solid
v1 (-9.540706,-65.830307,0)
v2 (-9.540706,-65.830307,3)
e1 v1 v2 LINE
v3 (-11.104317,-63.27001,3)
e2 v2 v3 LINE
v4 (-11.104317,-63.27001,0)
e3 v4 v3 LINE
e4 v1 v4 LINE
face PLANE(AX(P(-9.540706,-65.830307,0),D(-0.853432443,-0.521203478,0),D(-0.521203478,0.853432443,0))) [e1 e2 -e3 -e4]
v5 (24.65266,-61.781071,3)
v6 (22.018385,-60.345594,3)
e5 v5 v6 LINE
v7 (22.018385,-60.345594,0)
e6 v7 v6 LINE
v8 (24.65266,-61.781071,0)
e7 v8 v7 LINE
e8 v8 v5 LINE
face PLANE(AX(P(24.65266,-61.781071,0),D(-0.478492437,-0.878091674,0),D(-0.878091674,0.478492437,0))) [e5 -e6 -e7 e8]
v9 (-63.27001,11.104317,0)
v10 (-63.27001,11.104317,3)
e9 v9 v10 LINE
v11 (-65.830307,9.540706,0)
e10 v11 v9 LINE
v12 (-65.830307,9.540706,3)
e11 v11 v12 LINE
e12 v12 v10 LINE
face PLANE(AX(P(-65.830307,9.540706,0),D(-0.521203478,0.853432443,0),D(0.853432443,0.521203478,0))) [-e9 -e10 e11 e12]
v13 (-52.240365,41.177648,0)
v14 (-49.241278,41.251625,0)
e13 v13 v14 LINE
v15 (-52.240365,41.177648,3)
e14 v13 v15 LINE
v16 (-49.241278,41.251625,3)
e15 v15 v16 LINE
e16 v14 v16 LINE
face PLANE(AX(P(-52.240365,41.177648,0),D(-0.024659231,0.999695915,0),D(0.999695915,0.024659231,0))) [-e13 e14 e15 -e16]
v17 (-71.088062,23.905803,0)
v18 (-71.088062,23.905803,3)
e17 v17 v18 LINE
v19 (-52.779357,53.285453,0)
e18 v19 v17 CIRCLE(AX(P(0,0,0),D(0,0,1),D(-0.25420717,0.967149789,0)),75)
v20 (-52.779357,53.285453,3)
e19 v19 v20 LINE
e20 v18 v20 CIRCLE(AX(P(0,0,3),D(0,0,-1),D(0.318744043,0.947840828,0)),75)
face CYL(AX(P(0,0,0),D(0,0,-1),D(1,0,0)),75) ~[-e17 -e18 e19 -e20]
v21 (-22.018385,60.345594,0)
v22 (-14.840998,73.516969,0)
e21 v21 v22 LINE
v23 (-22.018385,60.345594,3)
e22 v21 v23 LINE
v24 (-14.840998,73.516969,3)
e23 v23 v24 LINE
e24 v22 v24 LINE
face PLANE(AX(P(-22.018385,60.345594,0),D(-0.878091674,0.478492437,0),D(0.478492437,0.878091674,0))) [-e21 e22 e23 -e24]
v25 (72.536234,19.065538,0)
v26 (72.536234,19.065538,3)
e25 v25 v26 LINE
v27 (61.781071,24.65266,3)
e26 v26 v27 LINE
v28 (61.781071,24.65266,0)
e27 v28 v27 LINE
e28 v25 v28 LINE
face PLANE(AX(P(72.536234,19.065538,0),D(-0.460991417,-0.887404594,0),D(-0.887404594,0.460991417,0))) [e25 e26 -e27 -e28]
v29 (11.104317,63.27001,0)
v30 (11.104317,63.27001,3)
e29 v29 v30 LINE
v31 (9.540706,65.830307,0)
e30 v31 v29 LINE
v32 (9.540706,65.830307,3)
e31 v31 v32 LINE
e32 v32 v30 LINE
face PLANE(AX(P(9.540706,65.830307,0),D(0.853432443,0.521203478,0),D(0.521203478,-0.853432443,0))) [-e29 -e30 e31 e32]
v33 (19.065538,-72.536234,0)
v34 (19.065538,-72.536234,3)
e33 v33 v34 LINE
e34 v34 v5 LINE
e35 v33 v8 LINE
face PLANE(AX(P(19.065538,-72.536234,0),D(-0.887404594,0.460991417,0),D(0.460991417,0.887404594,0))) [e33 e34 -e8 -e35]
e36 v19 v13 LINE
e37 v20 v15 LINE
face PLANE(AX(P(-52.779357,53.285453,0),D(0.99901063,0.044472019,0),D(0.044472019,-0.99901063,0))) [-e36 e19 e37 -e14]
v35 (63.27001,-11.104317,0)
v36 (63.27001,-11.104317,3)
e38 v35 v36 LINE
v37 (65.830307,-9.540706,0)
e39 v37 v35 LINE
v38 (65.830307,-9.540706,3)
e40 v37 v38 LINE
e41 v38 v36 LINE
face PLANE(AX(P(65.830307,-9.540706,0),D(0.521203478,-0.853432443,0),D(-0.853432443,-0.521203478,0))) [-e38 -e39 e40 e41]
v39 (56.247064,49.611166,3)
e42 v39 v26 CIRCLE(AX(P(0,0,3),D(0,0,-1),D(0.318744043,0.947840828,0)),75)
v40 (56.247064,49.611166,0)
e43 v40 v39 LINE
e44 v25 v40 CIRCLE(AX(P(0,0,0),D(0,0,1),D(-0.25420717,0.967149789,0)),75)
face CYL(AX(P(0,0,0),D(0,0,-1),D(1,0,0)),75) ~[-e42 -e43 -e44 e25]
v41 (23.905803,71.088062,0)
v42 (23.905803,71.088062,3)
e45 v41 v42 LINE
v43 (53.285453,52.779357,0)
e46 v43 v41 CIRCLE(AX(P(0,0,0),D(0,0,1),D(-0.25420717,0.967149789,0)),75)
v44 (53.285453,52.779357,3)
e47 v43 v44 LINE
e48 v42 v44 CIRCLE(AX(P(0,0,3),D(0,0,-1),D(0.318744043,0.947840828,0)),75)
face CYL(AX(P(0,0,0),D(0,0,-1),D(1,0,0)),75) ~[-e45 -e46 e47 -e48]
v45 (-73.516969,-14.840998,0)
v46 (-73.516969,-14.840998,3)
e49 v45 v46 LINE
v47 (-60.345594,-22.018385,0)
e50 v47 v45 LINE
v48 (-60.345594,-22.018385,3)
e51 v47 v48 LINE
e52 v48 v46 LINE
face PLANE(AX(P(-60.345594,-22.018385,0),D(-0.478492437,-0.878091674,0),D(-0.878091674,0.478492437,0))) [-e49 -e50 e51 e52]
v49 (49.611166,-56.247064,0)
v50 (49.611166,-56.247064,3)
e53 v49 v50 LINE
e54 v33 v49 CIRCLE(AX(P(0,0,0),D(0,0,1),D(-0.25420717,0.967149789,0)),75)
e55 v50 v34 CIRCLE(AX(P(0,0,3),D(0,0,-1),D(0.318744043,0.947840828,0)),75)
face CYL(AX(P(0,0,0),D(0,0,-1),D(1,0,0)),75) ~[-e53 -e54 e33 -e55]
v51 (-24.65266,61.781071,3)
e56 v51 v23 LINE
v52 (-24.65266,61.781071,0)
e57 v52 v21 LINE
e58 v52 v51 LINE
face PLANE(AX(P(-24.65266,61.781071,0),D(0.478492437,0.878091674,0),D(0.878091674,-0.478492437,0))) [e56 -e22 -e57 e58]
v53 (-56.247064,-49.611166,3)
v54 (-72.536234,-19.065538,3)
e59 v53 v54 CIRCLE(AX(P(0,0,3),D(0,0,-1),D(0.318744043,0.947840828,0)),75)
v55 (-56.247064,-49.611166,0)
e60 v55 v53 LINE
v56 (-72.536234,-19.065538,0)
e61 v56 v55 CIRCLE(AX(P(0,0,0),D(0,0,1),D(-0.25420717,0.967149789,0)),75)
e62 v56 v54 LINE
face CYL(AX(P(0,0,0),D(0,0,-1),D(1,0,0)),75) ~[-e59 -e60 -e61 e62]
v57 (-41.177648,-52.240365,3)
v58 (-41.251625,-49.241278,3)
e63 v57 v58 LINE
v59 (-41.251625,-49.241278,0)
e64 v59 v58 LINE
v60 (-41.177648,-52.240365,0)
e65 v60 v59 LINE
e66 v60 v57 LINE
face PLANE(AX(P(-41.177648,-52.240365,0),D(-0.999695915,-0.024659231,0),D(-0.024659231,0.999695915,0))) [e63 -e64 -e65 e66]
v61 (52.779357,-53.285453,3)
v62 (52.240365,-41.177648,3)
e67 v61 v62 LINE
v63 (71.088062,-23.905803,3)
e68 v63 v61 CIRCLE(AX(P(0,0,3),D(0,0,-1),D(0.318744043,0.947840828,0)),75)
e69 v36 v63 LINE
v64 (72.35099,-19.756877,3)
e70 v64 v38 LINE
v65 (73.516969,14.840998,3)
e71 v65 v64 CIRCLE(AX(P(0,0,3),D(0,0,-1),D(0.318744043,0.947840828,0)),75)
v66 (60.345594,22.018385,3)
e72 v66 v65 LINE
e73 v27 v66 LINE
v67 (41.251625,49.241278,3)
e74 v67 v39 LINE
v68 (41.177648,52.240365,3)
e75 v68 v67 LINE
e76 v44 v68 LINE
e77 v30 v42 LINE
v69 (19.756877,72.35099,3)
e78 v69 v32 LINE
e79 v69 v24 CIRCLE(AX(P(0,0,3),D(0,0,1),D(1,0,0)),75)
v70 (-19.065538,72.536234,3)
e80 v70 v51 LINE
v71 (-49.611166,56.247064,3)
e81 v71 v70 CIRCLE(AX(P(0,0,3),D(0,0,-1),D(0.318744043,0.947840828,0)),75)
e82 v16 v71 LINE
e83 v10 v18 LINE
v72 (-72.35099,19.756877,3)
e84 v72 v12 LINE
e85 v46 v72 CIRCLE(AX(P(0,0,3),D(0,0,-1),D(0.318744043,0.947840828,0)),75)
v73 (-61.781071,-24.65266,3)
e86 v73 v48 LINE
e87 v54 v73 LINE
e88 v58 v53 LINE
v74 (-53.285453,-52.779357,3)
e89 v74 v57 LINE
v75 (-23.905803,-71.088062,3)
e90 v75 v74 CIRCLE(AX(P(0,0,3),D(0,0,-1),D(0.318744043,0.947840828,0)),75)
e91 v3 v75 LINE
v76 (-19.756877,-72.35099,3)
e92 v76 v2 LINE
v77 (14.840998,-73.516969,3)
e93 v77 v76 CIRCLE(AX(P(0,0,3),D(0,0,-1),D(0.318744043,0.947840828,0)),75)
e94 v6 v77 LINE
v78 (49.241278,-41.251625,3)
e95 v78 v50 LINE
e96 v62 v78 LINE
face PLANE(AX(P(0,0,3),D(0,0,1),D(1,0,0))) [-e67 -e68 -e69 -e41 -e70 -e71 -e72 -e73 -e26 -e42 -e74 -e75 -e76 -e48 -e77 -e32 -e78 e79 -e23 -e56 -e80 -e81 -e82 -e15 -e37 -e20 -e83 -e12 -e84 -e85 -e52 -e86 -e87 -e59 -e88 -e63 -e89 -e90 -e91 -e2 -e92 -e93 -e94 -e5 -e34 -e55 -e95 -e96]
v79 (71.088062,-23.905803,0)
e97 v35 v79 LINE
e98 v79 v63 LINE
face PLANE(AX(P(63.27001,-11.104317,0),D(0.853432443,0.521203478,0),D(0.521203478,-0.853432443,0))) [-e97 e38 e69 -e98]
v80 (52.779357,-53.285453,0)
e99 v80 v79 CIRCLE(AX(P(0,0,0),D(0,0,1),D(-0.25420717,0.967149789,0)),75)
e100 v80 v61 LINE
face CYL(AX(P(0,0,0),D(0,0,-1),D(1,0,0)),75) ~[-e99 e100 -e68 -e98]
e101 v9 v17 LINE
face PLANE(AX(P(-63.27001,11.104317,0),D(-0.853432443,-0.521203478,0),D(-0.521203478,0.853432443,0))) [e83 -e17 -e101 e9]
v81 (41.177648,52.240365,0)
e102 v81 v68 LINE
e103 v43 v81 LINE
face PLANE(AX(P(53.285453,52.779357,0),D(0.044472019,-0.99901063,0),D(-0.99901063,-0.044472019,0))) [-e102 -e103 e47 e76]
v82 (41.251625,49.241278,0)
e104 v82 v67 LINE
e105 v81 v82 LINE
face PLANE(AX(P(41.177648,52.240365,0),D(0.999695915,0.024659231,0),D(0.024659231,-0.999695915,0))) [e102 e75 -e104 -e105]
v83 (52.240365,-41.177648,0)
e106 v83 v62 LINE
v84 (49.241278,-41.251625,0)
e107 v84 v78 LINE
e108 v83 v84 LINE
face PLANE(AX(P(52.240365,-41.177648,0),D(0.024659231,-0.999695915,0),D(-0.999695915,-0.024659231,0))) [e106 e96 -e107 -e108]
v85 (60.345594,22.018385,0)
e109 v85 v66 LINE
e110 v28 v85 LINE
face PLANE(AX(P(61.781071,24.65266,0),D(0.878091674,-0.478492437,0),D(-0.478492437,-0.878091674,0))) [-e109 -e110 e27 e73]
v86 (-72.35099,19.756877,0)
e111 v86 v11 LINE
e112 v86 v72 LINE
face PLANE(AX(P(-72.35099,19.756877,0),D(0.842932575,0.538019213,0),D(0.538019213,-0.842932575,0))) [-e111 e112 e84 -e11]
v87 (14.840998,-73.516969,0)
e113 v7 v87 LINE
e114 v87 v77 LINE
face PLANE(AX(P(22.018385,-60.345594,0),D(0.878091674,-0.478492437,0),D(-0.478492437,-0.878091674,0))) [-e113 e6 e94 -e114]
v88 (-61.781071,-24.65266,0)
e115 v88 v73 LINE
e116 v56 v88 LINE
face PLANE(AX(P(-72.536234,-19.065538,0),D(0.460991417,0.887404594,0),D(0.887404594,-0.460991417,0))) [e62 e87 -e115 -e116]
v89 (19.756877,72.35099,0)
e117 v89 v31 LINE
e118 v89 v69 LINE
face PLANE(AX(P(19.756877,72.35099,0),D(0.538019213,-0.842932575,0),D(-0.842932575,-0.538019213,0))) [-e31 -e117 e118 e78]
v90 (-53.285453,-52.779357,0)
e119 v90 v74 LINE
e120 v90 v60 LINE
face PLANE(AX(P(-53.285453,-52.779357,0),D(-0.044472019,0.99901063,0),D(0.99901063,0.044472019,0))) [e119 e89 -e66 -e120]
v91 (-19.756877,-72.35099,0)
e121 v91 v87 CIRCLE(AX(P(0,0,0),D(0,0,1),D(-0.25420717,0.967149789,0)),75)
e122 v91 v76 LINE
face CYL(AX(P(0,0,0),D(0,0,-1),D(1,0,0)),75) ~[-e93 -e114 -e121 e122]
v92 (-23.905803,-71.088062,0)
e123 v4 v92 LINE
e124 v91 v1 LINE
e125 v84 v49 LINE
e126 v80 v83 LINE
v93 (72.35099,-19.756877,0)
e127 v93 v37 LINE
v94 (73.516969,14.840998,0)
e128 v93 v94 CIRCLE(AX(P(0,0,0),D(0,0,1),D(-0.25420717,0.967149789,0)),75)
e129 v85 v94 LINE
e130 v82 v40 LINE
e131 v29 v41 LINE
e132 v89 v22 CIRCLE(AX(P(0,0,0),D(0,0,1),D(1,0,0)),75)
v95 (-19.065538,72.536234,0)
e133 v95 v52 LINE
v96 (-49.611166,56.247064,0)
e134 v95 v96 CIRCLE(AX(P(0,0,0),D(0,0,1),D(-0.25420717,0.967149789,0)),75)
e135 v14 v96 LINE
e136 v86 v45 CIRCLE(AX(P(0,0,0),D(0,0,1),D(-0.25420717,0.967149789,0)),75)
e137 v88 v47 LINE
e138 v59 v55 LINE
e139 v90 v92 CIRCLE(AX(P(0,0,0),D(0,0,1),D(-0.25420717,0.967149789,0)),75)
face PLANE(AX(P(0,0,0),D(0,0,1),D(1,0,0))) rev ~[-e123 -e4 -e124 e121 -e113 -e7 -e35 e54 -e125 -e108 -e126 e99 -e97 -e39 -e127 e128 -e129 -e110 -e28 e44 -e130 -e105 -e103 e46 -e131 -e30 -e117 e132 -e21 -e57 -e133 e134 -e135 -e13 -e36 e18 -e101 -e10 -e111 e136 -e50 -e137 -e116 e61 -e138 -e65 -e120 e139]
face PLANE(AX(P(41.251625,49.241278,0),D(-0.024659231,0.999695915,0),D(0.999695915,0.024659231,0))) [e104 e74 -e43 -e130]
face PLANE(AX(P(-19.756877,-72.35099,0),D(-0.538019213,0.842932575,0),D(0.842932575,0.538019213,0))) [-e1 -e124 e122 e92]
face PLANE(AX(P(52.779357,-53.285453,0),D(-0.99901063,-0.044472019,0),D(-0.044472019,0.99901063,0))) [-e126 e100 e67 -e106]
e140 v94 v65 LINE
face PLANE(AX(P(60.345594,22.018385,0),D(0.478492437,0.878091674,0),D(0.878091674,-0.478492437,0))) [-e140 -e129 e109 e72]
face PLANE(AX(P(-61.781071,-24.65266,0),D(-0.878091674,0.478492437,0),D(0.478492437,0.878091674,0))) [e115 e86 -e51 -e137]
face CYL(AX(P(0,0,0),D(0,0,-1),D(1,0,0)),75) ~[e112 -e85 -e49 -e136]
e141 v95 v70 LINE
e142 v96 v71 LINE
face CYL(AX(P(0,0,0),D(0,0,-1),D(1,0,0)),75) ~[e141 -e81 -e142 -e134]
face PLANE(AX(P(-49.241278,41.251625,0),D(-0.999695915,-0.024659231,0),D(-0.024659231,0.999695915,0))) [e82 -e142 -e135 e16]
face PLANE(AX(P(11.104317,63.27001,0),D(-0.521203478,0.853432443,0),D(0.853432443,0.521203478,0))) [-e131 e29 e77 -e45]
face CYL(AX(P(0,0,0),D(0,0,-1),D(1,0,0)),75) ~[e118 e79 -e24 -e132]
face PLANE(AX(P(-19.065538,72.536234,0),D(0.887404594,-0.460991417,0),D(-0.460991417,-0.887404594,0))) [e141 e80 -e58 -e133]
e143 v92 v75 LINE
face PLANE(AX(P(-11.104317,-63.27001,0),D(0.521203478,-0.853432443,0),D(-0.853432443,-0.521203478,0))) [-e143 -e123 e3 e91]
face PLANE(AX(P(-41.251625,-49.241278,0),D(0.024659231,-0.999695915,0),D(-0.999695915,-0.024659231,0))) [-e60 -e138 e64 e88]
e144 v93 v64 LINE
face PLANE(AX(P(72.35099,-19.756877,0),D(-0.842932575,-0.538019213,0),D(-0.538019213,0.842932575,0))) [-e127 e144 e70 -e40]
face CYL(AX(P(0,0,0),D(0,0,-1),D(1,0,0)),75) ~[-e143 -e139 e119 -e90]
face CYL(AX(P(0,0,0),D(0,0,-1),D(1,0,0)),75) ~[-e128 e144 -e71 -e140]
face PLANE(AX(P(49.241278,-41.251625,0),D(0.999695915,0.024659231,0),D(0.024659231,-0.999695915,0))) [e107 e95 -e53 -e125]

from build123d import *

# Parameters (mm, degrees)
F0_R            = 75
F1_DEPTH        = 3
F3_DEPTH        = 3
F3_COPIES_COUNT = 12


# Not quite as in the source:
# - a pattern or mirror of a feature is missing from the dataset's text; its kind, count and spacing are read off the source's solid


with BuildPart() as f1:
    # F0 (on Top) → F1 (new body)
    with BuildSketch(Plane.XY):
        Circle(F0_R)
    extrude(amount=F1_DEPTH)

    # F2 (on Top) → F3 (cut, through all)
    with BuildSketch(Plane.XY):
        with BuildLine():
            Line((23.905803232, 71.0880620909), (28.1729654475, 73.6940794788))
            Line((28.1729654475, 73.6940794788), (19.7568770352, 72.3509903859))
            ThreePointArc((19.7568770352, 72.3509903859), (21.840470668, 71.7495215385), (23.905803232, 71.0880620909))
        make_face()
        with BuildLine():
            Line((11.1043165854, 63.2700099269), (23.905803232, 71.0880620909))
            ThreePointArc((23.905803232, 71.0880620909), (21.840470668, 71.7495215385), (19.7568770352, 72.3509903859))
            Line((19.7568770352, 72.3509903859), (9.5407061526, 65.8303072562))
            Line((9.5407061526, 65.8303072562), (11.1043165854, 63.2700099269))
        make_face()
    f3 = extrude(amount=F3_DEPTH, mode=Mode.SUBTRACT)

    # F3_copies: F3 ×12 about axis
    f3_copies_axis = Axis((0, 0, 0), (0, 0, 1))
    for i in range(1, F3_COPIES_COUNT):
        add(f3.rotate(f3_copies_axis, i * 360 / F3_COPIES_COUNT), mode=Mode.SUBTRACT)


solid = f1.part
